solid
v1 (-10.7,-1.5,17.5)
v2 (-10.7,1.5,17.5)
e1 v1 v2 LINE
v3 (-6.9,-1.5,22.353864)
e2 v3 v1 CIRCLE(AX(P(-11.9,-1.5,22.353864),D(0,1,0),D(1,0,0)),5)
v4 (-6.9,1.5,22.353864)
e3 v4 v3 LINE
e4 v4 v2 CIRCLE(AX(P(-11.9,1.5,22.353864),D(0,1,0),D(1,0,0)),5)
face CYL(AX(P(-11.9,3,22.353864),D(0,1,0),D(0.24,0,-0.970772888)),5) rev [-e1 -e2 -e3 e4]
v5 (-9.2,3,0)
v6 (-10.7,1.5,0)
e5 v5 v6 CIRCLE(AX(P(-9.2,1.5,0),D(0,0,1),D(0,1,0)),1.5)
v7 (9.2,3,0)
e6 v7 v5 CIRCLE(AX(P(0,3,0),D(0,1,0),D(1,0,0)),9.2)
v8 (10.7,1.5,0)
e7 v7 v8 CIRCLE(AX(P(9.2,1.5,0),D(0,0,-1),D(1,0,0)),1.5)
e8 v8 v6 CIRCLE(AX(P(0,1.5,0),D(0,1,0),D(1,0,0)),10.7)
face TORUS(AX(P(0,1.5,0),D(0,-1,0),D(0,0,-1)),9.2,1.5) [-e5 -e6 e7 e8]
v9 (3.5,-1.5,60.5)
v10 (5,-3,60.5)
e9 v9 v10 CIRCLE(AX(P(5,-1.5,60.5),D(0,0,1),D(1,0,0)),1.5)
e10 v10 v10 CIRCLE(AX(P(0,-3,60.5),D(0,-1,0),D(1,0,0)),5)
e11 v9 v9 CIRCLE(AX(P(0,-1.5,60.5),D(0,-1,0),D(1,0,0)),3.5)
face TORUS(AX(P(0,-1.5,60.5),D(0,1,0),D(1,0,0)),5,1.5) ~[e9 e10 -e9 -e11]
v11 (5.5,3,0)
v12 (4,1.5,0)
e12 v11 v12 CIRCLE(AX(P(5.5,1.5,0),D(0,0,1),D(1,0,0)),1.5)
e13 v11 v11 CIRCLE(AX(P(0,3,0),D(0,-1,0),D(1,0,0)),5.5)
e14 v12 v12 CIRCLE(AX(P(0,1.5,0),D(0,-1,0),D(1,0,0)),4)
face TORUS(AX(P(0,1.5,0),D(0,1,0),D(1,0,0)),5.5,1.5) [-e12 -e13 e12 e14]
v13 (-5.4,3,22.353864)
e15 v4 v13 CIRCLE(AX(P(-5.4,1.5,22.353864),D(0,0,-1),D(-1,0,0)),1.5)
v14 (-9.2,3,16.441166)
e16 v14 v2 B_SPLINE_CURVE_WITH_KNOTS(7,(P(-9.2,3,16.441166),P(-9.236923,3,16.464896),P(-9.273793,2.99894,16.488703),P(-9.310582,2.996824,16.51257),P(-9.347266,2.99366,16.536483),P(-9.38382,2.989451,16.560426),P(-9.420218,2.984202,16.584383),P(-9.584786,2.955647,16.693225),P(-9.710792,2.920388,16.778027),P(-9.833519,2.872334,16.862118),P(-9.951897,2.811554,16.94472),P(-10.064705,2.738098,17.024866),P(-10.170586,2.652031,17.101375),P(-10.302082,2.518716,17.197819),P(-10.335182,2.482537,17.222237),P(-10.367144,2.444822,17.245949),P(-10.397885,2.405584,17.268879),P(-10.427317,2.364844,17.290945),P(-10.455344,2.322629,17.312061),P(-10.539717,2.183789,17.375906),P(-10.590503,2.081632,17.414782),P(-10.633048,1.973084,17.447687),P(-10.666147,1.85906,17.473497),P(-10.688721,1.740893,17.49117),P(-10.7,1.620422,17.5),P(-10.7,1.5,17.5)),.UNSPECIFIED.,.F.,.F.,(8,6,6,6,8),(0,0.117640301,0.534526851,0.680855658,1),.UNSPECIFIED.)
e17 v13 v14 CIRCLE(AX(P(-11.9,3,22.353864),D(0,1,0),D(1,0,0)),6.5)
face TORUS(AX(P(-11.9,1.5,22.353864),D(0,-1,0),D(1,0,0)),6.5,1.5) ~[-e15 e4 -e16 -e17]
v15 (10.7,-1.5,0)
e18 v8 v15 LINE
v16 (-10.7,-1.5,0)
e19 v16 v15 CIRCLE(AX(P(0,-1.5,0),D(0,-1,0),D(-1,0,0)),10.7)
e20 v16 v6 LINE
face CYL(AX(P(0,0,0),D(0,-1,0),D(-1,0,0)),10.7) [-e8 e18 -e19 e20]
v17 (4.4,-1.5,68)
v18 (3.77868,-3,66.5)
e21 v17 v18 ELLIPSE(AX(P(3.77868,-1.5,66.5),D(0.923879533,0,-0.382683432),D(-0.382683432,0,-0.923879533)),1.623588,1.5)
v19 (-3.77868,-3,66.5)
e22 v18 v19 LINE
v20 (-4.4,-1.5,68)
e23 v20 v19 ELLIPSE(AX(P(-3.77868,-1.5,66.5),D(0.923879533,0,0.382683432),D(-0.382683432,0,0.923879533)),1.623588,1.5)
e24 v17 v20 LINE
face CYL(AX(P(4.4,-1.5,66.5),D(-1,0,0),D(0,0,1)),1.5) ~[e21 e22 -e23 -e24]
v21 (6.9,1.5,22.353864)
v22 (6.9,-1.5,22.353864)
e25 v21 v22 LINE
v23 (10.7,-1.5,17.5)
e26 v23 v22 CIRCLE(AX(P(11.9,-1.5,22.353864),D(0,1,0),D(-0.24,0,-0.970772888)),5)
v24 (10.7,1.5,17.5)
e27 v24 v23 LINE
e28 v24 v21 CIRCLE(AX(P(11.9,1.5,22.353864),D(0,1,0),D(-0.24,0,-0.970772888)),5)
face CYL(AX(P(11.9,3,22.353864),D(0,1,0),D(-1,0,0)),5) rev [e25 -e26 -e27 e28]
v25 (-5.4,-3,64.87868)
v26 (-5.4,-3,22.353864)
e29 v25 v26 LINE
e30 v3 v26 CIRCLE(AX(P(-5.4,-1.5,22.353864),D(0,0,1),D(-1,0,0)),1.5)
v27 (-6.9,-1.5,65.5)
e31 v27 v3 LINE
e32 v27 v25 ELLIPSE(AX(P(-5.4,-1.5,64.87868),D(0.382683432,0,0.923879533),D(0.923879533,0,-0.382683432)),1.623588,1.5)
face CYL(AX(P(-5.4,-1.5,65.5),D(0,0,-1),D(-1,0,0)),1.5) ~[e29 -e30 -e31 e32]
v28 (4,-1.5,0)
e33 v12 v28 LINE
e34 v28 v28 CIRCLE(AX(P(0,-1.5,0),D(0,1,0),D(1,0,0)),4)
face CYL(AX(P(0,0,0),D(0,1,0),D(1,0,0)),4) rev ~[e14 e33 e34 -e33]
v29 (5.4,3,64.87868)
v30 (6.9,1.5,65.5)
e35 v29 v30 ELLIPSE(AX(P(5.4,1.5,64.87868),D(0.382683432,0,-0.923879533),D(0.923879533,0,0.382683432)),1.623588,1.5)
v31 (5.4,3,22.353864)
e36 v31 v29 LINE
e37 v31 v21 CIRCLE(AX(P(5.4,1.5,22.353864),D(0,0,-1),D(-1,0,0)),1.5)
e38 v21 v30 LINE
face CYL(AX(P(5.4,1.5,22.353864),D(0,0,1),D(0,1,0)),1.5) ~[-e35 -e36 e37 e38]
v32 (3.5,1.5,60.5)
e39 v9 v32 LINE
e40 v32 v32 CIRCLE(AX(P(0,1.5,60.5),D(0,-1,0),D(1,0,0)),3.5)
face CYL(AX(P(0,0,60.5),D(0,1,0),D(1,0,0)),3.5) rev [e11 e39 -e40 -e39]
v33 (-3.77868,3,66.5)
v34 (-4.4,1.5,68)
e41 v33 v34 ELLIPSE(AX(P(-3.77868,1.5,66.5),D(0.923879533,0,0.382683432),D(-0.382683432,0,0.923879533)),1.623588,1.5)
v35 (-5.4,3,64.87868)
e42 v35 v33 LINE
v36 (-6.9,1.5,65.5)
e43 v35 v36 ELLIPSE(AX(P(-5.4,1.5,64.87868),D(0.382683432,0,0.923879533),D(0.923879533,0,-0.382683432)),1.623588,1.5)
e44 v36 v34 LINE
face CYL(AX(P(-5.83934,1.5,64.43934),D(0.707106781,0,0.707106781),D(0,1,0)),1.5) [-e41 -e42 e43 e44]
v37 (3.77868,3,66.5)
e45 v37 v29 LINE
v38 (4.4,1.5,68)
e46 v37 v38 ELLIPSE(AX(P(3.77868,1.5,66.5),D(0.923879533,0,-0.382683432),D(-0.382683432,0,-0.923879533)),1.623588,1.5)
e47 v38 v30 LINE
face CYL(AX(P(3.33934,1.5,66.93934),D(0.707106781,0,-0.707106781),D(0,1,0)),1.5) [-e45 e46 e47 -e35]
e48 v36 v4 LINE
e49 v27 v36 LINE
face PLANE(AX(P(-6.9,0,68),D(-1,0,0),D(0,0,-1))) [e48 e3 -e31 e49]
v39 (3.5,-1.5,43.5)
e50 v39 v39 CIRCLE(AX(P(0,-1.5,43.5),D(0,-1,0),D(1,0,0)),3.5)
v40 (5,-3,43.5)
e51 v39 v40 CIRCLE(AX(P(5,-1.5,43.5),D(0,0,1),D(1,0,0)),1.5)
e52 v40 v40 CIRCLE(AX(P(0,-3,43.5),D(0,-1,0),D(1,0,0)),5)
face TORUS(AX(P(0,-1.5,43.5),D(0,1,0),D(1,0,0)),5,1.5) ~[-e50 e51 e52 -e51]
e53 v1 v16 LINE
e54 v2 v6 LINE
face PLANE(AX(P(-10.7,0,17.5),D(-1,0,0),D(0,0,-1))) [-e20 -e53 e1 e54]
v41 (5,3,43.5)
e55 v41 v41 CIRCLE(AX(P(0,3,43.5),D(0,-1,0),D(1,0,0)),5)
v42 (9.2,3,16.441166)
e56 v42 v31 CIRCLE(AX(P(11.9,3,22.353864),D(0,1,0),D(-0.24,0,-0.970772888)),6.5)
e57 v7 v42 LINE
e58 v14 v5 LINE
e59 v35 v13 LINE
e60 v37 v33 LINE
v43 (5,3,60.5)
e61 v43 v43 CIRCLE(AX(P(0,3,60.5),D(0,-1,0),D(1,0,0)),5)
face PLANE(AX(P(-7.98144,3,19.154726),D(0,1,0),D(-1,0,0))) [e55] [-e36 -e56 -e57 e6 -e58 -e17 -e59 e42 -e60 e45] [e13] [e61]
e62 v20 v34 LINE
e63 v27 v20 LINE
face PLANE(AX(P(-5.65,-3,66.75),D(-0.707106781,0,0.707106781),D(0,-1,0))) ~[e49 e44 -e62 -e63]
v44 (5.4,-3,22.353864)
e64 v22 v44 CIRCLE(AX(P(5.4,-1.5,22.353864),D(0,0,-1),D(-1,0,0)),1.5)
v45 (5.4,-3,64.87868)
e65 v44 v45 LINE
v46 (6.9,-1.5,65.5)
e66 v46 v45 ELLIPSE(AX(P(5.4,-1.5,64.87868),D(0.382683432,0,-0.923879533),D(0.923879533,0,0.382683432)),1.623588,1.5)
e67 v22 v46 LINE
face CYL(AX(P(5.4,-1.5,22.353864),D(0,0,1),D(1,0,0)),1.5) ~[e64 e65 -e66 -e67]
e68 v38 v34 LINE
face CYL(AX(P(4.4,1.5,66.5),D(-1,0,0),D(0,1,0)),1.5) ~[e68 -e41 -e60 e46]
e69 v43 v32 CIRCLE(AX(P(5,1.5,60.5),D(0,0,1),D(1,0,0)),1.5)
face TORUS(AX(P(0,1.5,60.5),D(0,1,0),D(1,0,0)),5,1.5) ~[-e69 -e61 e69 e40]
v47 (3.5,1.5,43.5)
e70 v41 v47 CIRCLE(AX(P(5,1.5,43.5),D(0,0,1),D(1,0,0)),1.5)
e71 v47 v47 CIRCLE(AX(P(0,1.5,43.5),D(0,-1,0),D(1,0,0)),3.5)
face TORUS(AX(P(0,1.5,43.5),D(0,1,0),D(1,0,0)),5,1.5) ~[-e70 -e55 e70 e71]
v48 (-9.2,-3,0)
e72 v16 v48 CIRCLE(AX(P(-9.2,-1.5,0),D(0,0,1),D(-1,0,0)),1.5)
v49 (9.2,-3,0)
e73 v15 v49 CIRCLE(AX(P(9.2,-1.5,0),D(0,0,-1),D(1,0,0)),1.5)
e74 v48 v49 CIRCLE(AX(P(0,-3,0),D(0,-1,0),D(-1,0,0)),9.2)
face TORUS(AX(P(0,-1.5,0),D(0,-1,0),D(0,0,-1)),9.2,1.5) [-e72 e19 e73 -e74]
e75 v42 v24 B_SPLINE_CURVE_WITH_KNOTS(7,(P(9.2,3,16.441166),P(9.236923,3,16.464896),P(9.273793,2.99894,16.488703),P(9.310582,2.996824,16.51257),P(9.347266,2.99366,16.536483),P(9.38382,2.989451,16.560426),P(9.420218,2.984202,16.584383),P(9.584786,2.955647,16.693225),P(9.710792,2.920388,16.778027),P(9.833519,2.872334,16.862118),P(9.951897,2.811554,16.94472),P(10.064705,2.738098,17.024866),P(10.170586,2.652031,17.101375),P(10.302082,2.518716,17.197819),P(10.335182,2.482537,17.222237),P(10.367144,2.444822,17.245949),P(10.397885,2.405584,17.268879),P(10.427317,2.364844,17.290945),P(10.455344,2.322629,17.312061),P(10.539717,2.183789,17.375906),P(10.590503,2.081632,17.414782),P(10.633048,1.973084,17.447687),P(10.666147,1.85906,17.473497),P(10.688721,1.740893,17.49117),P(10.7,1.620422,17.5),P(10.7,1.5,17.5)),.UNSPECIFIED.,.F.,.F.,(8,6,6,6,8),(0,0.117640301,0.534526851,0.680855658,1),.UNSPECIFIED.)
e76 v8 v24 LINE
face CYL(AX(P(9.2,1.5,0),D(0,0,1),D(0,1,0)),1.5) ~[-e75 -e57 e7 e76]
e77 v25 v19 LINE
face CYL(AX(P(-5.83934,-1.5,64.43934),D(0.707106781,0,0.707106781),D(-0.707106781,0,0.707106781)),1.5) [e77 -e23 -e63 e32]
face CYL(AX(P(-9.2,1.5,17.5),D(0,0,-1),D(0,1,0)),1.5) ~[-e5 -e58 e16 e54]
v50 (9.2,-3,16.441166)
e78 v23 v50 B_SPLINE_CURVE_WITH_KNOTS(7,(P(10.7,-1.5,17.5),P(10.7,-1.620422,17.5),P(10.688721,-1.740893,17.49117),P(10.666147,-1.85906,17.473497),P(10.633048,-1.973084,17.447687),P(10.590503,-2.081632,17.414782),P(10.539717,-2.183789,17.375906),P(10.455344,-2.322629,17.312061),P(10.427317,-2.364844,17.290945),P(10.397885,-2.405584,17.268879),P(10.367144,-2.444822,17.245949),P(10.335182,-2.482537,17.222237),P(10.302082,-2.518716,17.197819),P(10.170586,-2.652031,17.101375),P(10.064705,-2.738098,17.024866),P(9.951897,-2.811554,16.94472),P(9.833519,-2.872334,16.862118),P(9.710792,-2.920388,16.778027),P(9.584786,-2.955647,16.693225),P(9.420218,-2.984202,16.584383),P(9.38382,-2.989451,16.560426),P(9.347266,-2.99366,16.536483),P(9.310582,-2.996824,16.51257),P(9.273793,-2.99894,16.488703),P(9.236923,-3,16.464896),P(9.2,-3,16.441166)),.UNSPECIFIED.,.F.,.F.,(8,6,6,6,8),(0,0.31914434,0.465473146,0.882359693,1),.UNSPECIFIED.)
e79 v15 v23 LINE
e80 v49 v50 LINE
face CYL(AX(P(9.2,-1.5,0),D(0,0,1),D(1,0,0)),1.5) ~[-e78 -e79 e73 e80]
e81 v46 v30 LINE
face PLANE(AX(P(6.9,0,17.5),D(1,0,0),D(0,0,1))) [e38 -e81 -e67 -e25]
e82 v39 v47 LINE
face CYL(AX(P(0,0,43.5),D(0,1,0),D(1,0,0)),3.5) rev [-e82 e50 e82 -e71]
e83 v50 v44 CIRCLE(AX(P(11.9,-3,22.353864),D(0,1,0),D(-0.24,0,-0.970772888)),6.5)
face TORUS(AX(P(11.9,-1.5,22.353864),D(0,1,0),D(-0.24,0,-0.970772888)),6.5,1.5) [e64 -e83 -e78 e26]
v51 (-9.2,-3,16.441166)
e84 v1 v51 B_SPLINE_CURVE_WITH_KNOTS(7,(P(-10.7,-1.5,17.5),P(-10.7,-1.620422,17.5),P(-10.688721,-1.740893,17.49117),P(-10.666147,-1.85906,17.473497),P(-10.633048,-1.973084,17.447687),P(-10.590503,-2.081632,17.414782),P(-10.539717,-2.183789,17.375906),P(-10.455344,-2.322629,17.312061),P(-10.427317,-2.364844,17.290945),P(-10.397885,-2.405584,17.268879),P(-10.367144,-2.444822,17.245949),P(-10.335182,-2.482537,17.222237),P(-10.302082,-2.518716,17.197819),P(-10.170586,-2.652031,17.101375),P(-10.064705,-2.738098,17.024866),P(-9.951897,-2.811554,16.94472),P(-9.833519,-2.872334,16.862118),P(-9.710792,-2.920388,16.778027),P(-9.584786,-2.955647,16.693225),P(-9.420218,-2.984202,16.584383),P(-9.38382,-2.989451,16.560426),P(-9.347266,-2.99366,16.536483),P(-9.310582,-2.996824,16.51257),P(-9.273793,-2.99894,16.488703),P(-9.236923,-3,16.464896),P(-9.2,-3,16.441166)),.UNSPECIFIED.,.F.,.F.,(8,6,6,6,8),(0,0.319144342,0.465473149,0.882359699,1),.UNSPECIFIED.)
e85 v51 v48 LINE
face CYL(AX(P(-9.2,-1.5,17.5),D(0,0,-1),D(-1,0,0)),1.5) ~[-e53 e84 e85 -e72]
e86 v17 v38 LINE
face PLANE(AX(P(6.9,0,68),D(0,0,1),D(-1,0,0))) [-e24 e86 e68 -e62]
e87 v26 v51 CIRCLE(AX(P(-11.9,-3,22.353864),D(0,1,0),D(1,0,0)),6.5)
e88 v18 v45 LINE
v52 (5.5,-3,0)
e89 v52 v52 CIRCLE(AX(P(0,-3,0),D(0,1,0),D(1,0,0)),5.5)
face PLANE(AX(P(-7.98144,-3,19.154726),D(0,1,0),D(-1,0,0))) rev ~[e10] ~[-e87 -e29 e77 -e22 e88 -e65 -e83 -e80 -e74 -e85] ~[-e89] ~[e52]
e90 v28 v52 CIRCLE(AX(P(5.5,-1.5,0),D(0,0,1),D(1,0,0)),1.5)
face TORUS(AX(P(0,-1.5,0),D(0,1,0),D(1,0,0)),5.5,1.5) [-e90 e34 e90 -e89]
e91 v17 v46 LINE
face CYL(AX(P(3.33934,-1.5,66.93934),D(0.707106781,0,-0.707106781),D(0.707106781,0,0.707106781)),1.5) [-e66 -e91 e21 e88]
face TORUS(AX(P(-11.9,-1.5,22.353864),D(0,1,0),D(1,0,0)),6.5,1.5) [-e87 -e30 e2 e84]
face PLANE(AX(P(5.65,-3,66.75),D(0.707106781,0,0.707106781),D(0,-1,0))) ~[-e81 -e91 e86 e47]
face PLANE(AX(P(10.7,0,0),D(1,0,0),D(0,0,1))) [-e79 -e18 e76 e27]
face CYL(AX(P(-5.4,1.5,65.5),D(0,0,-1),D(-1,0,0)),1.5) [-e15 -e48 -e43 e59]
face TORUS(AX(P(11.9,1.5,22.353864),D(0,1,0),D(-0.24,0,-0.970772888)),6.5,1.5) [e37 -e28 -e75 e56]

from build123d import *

# Parameters (mm, degrees)
F0_R        = 3.5
F1_DEPTH    = 3
F2_T1_DEPTH = 6
F3_SIZE     = 2.5
F4_R        = 1.5


# Not quite as in the source:
# - a fillet or chamfer that OpenCascade refuses, or shapes differently, is made with other operations: its cross-section is extruded or revolved along the edge and cut away or added


with BuildPart() as f1:
    # F0 (on Front) → F1 (new body, symmetric)
    with BuildSketch(Plane.XZ):
        with BuildLine():
            ThreePointArc((-10.7, 0), (-7.5660425587, -7.5660425587), (0, -10.7))
            ThreePointArc((0, -10.7), (7.5660425587, -7.5660425587), (10.7, 0))
            Line((10.7, 0), (10.7, 17.5))
            Line((10.7, 17.5), (6.9, 17.5))
            Line((6.9, 17.5), (6.9, 68))
            Line((6.9, 68), (-6.9, 68))
            Line((-6.9, 68), (-6.9, 17.5))
            Line((-6.9, 17.5), (-10.7, 17.5))
            Line((-10.7, 17.5), (-10.7, 0))
        make_face()
        with BuildLine():
            ThreePointArc((0, -4), (-2.8284271247, 2.8284271247), (4, 0))
            ThreePointArc((4, 0), (2.8284271247, -2.8284271247), (0, -4))
        make_face(mode=Mode.SUBTRACT)
        with Locations((0, 43.5)):
            Circle(F0_R, mode=Mode.SUBTRACT)
        with Locations((0, 60.5)):
            Circle(F0_R, mode=Mode.SUBTRACT)
    extrude(amount=F1_DEPTH, both=True)

    # F2: fillet of radius 5 on 2 edges, made by hand

    # F2_s2 → F2_t1 (join)
    with BuildSketch(Plane.XZ.offset(-3)):
        with BuildLine():
            ThreePointArc((-10.7, 17.5), (-7.962996063, 19.2716574383), (-6.9, 22.3538644398))
            Line((-6.9, 22.3538644398), (-6.9, 17.5))
            Line((-6.9, 17.5), (-10.7, 17.5))
        make_face()
        with BuildLine():
            ThreePointArc((6.9, 22.3538644398), (7.962996063, 19.2716574383), (10.7, 17.5))
            Line((10.7, 17.5), (6.9, 17.5))
            Line((6.9, 17.5), (6.9, 22.3538644398))
        make_face()
    extrude(amount=F2_T1_DEPTH)

    # F3
    f3_edges = [f1.edges().sort_by_distance(p)[0] for p in [
        (-6.9, 0, 68),
        (6.9, 0, 68),
    ]]
    chamfer(f3_edges, length=F3_SIZE)

    # F4
    f4_edges = [f1.edges().sort_by_distance(p)[0] for p in [
        (6.9, -3, 43.926932),
        (5.65, -3, 66.75),
        (7.962996, -3, 19.271657),
        (0, -3, 68),
        (10.7, -3, 8.75),
        (-5.65, -3, 66.75),
        (0, -3, -10.7),
        (-6.9, -3, 43.926932),
        (-10.7, -3, 8.75),
        (-7.962996, -3, 19.271657),
        (2.828427, -3, -2.828427),
        (-2.828427, -3, 2.828427),
        (-3.5, -3, 43.5),
        (-3.5, -3, 60.5),
        (6.9, 3, 43.926932),
        (5.65, 3, 66.75),
        (7.962996, 3, 19.271657),
        (0, 3, 68),
        (10.7, 3, 8.75),
        (-5.65, 3, 66.75),
        (0, 3, -10.7),
        (-6.9, 3, 43.926932),
        (-10.7, 3, 8.75),
        (-7.962996, 3, 19.271657),
        (2.828427, 3, -2.828427),
        (-2.828427, 3, 2.828427),
        (-3.5, 3, 43.5),
        (-3.5, 3, 60.5),
    ]]
    fillet(f4_edges, radius=F4_R)


solid = f1.part
